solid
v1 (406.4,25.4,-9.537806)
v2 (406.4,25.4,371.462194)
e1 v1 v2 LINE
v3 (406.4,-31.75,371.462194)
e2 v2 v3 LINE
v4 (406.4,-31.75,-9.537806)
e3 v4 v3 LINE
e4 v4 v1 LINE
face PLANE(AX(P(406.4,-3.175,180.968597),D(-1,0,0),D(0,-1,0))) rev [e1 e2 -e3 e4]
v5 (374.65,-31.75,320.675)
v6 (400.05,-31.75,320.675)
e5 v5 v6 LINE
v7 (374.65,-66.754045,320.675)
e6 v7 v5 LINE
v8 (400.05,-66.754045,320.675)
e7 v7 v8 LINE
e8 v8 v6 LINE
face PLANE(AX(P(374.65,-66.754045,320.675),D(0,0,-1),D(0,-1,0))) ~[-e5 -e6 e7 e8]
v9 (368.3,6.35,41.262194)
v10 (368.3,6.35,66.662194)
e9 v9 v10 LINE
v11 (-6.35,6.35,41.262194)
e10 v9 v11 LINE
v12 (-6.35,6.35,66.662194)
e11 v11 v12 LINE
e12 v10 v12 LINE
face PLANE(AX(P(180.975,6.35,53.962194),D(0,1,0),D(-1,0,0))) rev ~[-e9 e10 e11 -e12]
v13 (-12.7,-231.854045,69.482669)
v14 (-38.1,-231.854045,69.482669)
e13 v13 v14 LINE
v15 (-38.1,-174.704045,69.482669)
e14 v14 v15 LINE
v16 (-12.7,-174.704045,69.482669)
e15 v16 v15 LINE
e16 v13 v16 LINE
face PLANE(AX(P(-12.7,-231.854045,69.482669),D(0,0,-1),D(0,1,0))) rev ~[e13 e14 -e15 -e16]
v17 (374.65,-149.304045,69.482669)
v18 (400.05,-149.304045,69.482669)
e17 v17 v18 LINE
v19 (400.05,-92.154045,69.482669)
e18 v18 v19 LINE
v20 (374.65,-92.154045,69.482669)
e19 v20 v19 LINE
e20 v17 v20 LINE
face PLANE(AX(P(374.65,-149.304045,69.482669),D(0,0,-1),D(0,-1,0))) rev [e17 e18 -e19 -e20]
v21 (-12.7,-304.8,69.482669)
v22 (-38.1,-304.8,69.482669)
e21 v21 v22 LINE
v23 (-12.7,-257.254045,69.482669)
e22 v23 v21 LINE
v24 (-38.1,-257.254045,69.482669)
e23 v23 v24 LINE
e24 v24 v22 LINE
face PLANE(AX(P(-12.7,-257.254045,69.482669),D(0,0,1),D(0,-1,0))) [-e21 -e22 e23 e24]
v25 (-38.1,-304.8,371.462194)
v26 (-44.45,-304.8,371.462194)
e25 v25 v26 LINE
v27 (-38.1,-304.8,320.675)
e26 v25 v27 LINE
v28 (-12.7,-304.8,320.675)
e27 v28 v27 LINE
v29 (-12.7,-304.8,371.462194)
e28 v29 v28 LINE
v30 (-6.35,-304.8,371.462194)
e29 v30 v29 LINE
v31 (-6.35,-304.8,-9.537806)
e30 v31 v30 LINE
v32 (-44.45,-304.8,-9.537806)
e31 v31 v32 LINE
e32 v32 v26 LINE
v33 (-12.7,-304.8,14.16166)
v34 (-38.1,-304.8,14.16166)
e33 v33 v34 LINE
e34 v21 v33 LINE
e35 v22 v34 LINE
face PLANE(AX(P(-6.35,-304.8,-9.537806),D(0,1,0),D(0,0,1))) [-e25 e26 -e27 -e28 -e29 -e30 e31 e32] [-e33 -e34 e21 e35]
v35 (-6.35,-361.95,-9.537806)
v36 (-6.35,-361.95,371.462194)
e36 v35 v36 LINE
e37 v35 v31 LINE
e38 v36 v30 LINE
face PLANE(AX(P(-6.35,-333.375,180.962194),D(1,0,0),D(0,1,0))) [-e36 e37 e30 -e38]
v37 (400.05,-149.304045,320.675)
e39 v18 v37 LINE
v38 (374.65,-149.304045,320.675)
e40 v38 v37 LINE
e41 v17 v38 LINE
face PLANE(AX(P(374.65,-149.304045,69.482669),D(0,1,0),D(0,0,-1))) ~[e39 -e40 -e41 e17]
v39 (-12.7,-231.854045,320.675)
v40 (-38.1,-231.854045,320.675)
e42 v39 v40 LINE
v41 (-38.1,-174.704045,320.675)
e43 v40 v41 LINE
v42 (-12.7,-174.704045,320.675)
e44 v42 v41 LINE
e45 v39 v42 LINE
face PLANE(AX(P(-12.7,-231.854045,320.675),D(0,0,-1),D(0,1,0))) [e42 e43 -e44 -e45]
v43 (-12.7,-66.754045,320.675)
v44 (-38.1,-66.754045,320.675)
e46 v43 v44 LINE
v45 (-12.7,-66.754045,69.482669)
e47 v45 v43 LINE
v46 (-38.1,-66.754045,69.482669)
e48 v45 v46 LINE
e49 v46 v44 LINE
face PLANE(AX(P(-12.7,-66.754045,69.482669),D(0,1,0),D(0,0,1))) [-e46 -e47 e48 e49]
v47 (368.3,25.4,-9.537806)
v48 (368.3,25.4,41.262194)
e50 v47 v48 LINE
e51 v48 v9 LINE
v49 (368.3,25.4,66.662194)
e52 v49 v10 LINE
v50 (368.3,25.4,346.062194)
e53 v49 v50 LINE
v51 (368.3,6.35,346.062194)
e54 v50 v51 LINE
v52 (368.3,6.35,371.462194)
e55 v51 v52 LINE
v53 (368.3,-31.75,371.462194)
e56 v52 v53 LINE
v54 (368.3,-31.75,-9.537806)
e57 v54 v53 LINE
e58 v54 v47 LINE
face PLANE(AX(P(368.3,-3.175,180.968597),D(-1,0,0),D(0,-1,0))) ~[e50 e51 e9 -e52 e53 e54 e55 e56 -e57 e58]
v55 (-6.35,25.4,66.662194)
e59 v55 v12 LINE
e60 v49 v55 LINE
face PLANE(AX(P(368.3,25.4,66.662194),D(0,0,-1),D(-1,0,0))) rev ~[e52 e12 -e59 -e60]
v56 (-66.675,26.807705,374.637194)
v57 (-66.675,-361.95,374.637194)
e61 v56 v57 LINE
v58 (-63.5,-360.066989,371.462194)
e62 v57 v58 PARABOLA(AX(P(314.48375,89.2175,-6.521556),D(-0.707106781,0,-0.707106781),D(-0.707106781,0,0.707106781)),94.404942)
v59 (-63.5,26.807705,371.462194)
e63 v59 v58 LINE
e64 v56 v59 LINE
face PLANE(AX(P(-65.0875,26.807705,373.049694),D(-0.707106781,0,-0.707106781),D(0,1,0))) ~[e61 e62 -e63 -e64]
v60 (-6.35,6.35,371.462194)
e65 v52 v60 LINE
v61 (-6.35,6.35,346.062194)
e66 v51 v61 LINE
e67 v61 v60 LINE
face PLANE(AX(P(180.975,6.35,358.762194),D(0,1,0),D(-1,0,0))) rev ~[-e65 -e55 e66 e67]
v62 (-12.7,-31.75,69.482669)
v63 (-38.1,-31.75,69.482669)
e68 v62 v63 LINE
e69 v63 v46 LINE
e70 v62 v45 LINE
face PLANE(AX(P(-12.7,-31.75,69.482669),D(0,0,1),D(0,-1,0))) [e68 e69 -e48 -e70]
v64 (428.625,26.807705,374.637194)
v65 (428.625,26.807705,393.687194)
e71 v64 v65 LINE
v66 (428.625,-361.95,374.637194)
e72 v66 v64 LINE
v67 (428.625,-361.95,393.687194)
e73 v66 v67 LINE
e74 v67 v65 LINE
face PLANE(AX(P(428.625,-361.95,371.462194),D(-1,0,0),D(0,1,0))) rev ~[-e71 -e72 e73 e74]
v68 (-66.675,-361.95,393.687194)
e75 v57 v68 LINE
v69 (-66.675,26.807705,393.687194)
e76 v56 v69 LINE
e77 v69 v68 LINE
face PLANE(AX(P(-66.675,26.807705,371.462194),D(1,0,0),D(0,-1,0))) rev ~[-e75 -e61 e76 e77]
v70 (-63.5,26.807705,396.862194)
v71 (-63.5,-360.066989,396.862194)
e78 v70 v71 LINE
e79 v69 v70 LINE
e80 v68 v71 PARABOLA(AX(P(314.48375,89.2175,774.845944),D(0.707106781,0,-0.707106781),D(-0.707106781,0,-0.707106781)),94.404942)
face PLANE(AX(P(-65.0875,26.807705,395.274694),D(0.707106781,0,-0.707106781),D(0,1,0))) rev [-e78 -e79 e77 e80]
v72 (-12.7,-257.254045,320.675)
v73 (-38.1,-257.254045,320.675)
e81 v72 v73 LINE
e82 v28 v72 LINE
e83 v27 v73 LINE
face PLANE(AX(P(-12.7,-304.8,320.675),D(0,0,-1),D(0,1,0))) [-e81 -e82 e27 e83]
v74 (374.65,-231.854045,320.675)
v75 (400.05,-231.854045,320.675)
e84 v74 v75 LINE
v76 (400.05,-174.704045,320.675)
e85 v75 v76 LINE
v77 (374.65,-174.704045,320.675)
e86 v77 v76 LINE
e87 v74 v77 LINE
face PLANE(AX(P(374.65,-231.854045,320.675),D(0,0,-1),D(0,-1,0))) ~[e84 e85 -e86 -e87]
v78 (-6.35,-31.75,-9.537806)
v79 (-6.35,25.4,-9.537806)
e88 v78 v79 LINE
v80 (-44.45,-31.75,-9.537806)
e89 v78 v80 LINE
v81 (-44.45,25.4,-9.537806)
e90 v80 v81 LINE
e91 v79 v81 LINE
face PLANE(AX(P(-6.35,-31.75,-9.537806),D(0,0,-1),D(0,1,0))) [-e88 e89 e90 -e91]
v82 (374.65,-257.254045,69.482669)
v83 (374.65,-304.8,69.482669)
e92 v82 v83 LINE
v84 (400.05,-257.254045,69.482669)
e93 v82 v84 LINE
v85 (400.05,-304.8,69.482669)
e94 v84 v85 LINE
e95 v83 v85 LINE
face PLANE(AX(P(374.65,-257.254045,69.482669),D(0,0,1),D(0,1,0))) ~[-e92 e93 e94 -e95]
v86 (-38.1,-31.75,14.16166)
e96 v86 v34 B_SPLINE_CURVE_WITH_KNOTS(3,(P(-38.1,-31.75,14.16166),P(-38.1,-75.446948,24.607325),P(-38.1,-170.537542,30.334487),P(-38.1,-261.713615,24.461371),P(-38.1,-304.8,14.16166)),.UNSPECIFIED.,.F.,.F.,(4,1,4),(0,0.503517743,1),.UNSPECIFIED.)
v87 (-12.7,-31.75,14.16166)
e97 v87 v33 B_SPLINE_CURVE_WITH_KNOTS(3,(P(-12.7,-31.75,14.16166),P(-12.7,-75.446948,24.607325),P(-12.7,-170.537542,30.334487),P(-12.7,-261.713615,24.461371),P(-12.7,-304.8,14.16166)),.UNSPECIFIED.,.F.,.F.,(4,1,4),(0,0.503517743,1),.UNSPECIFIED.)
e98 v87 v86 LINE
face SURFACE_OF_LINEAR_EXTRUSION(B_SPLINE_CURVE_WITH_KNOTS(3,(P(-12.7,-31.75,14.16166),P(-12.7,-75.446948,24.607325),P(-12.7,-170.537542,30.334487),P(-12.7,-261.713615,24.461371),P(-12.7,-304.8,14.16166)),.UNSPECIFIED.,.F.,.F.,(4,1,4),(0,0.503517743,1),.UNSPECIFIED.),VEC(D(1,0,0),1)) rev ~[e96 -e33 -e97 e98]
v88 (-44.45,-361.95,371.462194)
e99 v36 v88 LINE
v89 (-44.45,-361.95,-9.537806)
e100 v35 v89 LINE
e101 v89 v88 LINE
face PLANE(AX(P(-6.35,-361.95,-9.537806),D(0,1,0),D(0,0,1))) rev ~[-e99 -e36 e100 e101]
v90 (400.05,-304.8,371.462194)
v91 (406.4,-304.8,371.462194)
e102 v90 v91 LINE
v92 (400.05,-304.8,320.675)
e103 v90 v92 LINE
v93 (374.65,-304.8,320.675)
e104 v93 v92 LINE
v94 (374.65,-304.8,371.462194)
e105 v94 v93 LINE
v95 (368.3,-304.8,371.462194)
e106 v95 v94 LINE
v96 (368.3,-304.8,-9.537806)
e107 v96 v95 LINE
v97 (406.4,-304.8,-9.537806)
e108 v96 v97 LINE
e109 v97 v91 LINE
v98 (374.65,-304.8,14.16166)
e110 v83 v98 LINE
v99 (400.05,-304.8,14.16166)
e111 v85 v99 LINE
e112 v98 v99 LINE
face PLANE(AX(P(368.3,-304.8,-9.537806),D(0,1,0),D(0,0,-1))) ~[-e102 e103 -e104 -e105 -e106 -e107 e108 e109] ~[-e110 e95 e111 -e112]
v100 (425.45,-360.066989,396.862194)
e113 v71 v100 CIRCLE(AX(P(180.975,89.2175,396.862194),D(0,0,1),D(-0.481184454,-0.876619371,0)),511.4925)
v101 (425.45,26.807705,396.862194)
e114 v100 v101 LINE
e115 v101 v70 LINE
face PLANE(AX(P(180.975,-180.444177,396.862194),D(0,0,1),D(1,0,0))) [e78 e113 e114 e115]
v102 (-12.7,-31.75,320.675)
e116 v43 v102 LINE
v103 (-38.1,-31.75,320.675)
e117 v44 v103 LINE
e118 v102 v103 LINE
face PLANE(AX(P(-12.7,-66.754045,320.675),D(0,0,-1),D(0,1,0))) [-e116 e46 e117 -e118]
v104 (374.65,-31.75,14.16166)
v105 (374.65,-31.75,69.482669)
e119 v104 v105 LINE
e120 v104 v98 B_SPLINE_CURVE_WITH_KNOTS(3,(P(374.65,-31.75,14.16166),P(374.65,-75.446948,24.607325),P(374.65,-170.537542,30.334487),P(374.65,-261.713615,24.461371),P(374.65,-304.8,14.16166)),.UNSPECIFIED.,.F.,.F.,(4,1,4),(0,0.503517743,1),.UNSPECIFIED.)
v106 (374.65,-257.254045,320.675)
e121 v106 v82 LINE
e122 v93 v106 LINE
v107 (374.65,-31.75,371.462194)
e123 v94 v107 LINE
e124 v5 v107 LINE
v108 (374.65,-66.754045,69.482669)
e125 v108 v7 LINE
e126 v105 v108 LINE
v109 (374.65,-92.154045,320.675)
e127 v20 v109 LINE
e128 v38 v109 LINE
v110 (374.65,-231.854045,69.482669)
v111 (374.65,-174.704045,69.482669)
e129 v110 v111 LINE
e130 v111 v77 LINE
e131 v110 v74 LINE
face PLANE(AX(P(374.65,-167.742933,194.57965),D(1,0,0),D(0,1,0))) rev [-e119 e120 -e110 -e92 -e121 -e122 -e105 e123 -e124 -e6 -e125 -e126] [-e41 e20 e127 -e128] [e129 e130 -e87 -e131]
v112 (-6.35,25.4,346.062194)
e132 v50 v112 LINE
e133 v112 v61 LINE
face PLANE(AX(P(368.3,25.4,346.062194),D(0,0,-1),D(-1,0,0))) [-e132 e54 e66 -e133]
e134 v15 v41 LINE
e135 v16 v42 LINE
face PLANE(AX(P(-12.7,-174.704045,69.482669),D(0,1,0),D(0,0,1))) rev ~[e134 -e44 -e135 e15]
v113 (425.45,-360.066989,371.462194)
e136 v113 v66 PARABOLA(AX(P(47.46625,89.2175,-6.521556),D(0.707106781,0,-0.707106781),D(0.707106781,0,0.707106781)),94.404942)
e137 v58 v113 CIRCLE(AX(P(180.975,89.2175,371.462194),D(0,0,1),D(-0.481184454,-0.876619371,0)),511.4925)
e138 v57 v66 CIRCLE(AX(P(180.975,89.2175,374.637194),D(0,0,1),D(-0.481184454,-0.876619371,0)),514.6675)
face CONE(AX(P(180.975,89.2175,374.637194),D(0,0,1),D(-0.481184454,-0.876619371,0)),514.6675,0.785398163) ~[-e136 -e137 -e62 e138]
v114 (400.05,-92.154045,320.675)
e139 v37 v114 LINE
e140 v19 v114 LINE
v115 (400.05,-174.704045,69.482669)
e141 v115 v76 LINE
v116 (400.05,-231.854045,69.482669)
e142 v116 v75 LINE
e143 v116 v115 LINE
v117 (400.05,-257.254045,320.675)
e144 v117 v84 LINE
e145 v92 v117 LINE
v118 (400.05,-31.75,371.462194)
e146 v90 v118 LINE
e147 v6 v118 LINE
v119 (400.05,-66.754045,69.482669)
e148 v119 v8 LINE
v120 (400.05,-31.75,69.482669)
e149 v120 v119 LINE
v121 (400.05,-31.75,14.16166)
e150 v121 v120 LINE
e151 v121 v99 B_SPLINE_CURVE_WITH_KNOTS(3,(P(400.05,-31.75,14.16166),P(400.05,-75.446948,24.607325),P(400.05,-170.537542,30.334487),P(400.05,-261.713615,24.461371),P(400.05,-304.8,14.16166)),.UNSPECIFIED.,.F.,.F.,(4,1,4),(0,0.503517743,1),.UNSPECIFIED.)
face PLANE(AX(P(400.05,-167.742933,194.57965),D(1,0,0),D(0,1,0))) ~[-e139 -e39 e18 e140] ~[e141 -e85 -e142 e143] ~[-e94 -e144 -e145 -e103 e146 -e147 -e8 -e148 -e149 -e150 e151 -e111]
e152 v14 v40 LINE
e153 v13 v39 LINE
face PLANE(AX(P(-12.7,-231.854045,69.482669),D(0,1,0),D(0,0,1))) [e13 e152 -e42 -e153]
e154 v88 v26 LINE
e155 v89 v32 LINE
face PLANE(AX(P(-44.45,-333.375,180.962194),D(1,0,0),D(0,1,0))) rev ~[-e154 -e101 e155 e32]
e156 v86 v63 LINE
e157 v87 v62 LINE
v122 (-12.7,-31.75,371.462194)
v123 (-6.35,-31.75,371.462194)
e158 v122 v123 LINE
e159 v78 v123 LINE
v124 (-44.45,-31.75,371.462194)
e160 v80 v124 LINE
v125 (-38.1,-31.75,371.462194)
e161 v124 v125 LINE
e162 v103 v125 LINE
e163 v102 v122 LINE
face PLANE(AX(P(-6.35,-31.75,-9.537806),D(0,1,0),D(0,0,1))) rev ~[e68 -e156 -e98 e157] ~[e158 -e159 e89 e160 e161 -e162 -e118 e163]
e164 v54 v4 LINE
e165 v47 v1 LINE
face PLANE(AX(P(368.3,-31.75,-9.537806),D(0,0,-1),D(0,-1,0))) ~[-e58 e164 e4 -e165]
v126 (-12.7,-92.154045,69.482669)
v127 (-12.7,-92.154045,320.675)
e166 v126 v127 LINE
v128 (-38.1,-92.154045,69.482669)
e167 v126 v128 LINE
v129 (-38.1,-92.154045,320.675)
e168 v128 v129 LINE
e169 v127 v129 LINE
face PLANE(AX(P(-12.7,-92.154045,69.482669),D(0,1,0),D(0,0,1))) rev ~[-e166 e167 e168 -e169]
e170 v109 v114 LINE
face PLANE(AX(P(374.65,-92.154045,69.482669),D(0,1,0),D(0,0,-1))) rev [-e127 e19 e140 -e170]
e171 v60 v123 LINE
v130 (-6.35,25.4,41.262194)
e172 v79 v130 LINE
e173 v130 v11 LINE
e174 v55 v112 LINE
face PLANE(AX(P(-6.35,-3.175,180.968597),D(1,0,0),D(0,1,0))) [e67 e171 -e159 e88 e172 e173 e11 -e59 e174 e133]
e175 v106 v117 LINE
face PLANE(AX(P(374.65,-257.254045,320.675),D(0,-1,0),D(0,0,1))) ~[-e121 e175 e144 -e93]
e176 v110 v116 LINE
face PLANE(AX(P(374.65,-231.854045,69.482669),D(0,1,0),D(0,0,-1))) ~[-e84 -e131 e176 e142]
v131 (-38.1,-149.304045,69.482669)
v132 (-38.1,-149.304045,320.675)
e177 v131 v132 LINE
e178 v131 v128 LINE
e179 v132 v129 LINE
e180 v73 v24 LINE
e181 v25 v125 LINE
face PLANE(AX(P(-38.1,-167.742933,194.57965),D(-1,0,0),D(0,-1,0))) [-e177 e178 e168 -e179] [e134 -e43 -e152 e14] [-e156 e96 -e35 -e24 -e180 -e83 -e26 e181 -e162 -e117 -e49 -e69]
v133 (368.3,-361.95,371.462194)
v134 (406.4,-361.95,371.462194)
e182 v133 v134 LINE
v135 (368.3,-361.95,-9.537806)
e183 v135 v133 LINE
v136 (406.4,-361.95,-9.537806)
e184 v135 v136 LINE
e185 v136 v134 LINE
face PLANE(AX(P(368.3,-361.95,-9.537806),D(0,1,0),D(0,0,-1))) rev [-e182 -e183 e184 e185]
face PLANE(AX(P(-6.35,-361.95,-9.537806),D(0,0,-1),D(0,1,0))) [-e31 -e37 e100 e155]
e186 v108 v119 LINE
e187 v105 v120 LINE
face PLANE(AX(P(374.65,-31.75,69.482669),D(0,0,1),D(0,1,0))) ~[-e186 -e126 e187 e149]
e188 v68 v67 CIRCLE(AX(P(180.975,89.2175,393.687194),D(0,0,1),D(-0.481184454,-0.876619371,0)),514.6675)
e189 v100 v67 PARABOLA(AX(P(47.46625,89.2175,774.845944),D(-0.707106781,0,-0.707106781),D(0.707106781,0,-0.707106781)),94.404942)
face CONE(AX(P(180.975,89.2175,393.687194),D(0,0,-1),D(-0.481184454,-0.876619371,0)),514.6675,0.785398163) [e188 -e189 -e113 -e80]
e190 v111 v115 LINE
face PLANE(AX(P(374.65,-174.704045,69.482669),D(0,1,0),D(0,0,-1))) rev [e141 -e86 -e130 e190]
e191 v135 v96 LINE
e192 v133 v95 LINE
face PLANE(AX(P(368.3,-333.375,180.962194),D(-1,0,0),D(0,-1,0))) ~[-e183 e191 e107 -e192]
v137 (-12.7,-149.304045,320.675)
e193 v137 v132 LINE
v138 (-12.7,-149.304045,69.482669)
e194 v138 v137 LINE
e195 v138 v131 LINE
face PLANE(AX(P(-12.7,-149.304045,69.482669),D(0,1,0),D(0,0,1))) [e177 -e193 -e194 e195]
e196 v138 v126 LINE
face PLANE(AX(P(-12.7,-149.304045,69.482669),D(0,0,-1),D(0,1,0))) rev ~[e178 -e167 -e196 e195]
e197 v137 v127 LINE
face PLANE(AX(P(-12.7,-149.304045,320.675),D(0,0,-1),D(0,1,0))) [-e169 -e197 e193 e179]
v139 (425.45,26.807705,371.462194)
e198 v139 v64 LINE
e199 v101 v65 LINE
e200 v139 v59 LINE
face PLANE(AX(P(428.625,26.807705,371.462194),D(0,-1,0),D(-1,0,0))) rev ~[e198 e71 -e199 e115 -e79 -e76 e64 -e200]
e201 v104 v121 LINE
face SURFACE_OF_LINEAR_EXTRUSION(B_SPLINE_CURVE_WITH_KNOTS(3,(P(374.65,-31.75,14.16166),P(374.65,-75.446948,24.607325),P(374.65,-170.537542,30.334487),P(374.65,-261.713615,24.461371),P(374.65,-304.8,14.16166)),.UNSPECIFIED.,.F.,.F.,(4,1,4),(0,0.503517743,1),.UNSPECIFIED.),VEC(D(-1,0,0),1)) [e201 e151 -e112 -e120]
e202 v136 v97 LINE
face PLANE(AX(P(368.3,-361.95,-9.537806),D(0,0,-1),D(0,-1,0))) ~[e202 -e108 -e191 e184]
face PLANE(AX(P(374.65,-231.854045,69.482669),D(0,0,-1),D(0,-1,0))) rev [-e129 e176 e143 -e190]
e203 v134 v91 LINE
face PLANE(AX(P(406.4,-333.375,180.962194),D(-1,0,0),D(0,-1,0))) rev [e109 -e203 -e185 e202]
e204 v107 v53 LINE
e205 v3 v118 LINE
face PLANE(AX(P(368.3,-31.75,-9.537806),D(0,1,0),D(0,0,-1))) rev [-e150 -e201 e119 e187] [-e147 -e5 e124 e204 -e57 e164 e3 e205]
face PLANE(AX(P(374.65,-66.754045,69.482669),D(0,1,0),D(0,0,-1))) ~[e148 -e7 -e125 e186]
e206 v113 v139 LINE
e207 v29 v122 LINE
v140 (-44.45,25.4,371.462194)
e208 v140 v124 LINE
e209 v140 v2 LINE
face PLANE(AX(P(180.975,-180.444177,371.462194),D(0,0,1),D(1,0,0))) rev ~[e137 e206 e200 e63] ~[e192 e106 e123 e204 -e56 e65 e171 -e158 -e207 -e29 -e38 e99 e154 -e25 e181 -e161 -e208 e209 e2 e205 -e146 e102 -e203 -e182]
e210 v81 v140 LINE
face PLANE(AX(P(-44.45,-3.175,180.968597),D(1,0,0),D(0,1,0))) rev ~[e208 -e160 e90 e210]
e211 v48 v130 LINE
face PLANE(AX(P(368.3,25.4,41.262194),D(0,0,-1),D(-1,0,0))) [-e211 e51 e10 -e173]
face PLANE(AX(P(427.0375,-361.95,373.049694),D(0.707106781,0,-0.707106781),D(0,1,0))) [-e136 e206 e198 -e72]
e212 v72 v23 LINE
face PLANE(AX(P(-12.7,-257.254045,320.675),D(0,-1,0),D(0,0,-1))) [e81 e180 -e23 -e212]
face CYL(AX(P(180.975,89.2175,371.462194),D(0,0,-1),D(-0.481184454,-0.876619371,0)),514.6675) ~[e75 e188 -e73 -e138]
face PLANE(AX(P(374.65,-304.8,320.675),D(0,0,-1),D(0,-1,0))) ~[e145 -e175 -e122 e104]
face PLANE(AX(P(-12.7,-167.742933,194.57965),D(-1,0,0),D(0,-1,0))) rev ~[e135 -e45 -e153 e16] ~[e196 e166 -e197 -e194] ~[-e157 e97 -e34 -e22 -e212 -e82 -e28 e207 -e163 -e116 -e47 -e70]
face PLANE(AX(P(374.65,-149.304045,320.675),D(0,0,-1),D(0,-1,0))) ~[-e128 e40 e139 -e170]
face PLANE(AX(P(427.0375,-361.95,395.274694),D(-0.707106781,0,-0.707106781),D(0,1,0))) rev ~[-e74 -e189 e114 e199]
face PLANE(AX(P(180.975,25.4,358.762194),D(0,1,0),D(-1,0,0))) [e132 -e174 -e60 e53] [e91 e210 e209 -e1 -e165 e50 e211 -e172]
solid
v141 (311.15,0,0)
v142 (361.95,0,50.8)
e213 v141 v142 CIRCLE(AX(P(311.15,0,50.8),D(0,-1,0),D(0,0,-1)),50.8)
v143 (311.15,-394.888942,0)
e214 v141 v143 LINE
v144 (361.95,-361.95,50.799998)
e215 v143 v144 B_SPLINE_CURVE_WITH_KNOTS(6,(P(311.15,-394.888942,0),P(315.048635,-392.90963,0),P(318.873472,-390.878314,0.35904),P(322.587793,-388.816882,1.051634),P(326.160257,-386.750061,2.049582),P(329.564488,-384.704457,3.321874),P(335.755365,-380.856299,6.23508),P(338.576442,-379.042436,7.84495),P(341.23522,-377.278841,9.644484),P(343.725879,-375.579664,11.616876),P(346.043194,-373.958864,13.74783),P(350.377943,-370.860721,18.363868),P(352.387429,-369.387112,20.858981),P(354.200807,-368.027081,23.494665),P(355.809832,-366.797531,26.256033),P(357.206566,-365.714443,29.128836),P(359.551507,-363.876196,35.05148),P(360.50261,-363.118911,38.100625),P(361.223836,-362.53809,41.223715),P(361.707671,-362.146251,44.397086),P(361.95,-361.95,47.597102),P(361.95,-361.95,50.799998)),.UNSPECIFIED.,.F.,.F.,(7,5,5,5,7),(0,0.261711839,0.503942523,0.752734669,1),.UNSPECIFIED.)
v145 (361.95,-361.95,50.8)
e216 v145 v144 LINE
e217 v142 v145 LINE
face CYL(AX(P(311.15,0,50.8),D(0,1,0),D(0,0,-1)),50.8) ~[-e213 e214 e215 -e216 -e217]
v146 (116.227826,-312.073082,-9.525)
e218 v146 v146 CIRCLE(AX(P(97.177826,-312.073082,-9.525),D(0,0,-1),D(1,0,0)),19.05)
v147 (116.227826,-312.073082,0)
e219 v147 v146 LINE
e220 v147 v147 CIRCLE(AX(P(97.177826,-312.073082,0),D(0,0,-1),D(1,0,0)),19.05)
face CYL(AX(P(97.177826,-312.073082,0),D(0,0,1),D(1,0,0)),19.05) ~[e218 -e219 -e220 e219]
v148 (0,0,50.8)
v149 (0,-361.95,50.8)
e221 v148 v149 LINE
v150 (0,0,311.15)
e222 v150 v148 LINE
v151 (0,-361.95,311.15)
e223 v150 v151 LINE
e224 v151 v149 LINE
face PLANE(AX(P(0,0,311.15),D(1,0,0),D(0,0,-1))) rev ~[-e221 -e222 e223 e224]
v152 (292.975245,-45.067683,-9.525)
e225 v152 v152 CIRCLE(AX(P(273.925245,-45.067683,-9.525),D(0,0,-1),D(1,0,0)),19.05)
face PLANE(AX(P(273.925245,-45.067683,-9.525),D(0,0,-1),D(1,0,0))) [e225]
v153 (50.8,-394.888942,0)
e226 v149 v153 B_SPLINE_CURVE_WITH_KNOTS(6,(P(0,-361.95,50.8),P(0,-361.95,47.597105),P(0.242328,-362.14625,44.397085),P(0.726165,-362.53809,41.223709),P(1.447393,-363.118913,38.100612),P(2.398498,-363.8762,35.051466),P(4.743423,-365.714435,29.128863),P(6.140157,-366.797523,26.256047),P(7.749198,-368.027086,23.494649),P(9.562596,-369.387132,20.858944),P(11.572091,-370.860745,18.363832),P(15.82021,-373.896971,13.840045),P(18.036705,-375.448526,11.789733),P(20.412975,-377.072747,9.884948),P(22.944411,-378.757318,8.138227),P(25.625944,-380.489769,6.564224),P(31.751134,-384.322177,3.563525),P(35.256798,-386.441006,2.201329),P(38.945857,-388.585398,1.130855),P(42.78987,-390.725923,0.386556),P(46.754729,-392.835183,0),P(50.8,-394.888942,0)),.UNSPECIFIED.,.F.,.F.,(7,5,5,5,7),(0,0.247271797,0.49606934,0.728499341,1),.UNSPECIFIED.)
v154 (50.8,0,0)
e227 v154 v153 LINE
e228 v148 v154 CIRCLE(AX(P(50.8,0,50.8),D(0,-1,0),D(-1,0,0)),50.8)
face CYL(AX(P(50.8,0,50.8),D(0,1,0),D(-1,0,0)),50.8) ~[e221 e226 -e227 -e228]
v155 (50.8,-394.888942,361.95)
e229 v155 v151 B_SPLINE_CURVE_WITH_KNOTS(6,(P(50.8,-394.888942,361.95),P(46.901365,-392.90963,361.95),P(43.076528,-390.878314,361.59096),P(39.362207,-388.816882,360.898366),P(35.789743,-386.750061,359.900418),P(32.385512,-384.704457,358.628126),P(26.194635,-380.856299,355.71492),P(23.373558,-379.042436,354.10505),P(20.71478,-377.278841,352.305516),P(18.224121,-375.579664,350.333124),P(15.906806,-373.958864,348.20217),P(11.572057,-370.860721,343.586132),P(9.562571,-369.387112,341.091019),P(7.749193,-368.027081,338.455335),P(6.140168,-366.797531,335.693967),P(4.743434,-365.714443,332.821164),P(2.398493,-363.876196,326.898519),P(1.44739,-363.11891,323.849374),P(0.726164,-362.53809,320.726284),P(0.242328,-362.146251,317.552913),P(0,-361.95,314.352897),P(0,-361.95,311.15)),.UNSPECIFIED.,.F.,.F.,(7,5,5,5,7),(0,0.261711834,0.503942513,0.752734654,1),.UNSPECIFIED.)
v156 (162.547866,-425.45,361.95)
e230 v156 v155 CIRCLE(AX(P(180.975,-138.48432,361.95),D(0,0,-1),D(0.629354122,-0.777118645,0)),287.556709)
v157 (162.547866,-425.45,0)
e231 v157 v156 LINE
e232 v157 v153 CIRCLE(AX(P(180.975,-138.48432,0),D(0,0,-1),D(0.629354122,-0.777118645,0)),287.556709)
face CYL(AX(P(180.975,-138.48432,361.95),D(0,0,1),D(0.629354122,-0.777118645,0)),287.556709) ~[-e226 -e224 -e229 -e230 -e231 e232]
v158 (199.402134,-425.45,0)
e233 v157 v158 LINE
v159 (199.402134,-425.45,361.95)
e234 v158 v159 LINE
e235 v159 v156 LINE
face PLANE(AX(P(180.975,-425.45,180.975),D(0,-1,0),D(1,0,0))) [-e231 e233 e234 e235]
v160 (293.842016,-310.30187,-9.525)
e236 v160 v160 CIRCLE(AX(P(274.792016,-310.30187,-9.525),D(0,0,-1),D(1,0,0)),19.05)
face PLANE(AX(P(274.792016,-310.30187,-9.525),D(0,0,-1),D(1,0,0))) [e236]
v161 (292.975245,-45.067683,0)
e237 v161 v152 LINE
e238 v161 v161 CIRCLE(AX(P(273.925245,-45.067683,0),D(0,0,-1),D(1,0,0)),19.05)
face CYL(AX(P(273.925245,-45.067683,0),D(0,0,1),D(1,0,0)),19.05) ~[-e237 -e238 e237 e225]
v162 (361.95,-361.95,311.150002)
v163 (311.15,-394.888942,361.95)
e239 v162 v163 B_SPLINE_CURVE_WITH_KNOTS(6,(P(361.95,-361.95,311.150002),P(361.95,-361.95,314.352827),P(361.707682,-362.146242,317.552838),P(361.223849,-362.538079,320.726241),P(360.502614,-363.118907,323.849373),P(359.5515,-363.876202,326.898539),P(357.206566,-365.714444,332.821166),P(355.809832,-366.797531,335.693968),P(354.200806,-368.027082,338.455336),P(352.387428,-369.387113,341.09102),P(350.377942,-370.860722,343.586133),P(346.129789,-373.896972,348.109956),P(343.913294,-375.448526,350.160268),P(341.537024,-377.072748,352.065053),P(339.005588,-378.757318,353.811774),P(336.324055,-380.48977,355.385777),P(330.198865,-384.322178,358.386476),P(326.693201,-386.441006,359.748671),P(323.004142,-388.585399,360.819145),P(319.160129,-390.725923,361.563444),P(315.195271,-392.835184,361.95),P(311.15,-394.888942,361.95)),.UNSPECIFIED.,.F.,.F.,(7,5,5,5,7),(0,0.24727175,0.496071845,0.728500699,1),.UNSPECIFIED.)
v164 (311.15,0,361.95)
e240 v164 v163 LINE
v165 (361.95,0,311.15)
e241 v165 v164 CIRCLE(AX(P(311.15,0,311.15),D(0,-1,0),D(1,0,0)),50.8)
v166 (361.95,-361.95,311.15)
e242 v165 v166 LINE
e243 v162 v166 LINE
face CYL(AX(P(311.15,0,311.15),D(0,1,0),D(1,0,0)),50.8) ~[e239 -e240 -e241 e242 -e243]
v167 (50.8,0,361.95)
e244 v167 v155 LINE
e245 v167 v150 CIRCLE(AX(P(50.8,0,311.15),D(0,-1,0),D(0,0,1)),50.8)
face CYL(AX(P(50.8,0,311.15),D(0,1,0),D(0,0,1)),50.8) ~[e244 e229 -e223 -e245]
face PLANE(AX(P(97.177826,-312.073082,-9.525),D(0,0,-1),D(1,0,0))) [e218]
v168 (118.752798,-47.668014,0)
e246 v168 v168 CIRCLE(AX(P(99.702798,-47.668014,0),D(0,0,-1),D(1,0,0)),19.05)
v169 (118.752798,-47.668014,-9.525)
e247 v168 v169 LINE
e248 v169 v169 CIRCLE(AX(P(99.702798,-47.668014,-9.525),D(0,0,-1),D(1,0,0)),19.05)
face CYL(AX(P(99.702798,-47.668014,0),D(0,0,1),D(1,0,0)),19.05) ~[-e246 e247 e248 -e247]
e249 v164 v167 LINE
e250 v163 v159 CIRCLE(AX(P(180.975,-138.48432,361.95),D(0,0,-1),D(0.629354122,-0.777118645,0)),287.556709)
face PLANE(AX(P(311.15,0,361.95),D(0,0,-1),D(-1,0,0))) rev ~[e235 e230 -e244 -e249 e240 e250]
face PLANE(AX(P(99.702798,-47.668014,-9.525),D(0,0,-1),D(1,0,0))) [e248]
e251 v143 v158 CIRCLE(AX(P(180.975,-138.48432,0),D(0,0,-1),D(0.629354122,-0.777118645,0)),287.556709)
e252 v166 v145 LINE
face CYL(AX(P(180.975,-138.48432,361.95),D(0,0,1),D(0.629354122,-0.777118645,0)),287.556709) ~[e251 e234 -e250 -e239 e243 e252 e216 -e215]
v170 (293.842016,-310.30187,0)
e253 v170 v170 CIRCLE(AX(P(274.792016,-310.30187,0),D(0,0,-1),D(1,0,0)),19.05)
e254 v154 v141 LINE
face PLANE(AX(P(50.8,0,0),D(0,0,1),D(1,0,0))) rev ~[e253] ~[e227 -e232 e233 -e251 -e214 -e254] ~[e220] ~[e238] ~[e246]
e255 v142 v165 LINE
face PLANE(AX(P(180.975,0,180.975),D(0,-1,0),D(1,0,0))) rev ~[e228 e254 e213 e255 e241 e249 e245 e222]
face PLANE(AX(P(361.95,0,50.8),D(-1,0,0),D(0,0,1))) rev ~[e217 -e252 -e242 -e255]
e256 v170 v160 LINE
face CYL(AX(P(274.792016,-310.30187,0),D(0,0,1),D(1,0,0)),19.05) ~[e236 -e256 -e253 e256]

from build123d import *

# Parameters (mm, degrees)
F4_DEPTH  = 425.45
F5_R      = 19.05
F6_DEPTH  = 9.525
F8_DEPTH  = 361.95
F9_W      = 57.15
F9_H      = 381.0128062427
F10_DEPTH = 38.1
F9_H_2    = 381
F11_W     = 57.15
F11_H     = 251.1923307657
F12_DEPTH = 25.4
F16_DEPTH = 25.4
F17_SIZE  = 3.175
F18_W     = 374.65
F18_H     = 25.4
F19_DEPTH = 19.05


# Not quite as in the source:
# - a feature names something its author has since deleted; it is built from what else it names


with BuildPart() as f4:
    # F3 (on Front) → F4 (new body)
    with BuildSketch(Plane.XZ):
        with BuildLine():
            ThreePointArc((0, 50.8), (14.8789755157, 14.8789755157), (50.8, 0))
            Line((50.8, 0), (311.15, 0))
            ThreePointArc((311.15, 0), (347.0710244843, 14.8789755157), (361.95, 50.8))
            Line((361.95, 50.8), (361.95, 311.15))
            ThreePointArc((361.95, 311.15), (347.0710244843, 347.0710244843), (311.15, 361.95))
            Line((311.15, 361.95), (50.8, 361.95))
            ThreePointArc((50.8, 361.95), (14.8789755157, 347.0710244843), (0, 311.15))
            Line((0, 311.15), (0, 50.8))
        make_face()
    extrude(amount=F4_DEPTH)

    # F5 (on face) → F6 (join)
    with BuildSketch(Plane(origin=(0, 0, 0), x_dir=(1, 0, 0), z_dir=(0, 0, -1))):
        with Locations((97.1778258681, 312.0730817318)):
            Circle(F5_R)
        with Locations((274.7920155525, 310.3018701077)):
            Circle(F5_R)
        with Locations((273.9252448082, 45.0676828623)):
            Circle(F5_R)
        with Locations((99.7027978301, 47.6680137217)):
            Circle(F5_R)
    extrude(amount=F6_DEPTH)

    # F7 (on face) → F8 (cut)
    with BuildSketch(Plane.XY.offset(361.95)):
        with BuildLine():
            Line((0, -361.95), (0, -425.45))
            Line((0, -425.45), (0, -444.5584714413))
            Line((0, -444.5584714413), (361.95, -444.5584714413))
            Line((361.95, -444.5584714413), (361.95, -425.45))
            Line((361.95, -425.45), (361.95, -361.95))
            ThreePointArc((361.95, -361.95), (180.975, -426.0410288054), (0, -361.95))
        make_face()
    extrude(amount=-F8_DEPTH, mode=Mode.SUBTRACT)


with BuildPart() as f10:
    # F9 (on offset) → F10 (new body)
    with BuildSketch(Plane.YZ.offset(-6.35)):
        with Locations((-3.175, 180.9685968786)):
            Rectangle(F9_W, F9_H)
    extrude(amount=-F10_DEPTH)



with BuildPart() as f10b:
    # F9 (on offset) → F10, piece 2 (new body)
    with BuildSketch(Plane.YZ.offset(-6.35)):
        with Locations((-333.375, 180.9621937573)):
            Rectangle(F9_W, F9_H_2)
    extrude(amount=-F10_DEPTH)


with BuildPart() as f10_1:
    add(f10.part)

    add(f10b.part)  # F12 merges F10b
    # F11 (on offset) → F12 (join)
    with BuildSketch(Plane.YZ.offset(-12.7)):
        with BuildLine():
            add(Edge.make_bspline(
                [(-31.75, 14.161660336), (-75.4469480959, 24.607324823), (-170.5375424164, 30.3344869468), (-261.7136147626, 24.4613710426), (-304.8, 14.161660336)],
                knots=[0, 0, 0, 0, 0.5035177426, 1, 1, 1, 1], degree=3))
            Line((-31.75, 14.161660336), (-31.75, 69.4826692343))
            Line((-31.75, 69.4826692343), (-66.7540449142, 69.4826692343))
            Line((-66.7540449142, 69.4826692343), (-66.7540449142, 320.675))
            Line((-66.7540449142, 320.675), (-31.75, 320.675))
            Line((-31.75, 320.675), (-31.75, 371.475))
            Line((-31.75, 371.475), (-304.8, 371.475))
            Line((-304.8, 371.475), (-304.8, 371.4621937573))
            Line((-304.8, 371.4621937573), (-304.8, 320.675))
            Line((-304.8, 320.675), (-257.2540449142, 320.675))
            Line((-257.2540449142, 320.675), (-257.2540449142, 69.4826692343))
            Line((-257.2540449142, 69.4826692343), (-304.8, 69.4826692343))
            Line((-304.8, 69.4826692343), (-304.8, 14.161660336))
        make_face()
        with Locations((-203.2790449142, 195.0788346171)):
            Rectangle(F11_W, F11_H, mode=Mode.SUBTRACT)
        with Locations((-120.7290449142, 195.0788346171)):
            Rectangle(F11_W, F11_H, mode=Mode.SUBTRACT)
    extrude(amount=-F12_DEPTH)


with BuildPart() as f13_1:
    # F13: instance of F10
    add(f10_1.part.mirror(Plane.YZ.offset(180.975)))


with BuildPart() as f10_2:
    add(f10_1.part)

    add(f13_1.part)  # F16 merges F13_1
    # F15 (on offset) → F16 (join)
    with BuildSketch(Plane.XY.offset(371.4621937573)):
        with BuildLine():
            Line((-66.675, 26.8077049404), (-66.675, 0))
            Line((-66.675, 0), (-66.675, -361.95))
            ThreePointArc((-66.675, -361.95), (180.975, -425.45), (428.625, -361.95))
            Line((428.625, -361.95), (428.625, 0))
            Line((428.625, 0), (428.625, 26.8077049404))
            Line((428.625, 26.8077049404), (-66.675, 26.8077049404))
        make_face()
    extrude(amount=F16_DEPTH)

    # F17
    f17_edges = [f10_2.edges().sort_by_distance(p)[0] for p in [
        (428.625, -167.571148, 396.862194),
        (180.975, -425.45, 396.862194),
        (-66.675, -167.571148, 396.862194),
        (428.625, -167.571148, 371.462194),
        (180.975, -425.45, 371.462194),
        (-66.675, -167.571148, 371.462194),
    ]]
    chamfer(f17_edges, length=F17_SIZE)

    # F18 (on face) → F19 (join)
    with BuildSketch(Plane(origin=(0, 25.4, 0), x_dir=(-1, 0, 0), z_dir=(0, 1, 0))):
        with Locations((-180.975, 358.7621937573)):
            Rectangle(F18_W, F18_H)
        with Locations((-180.975, 53.9621937573)):
            Rectangle(F18_W, F18_H)
    extrude(amount=-F19_DEPTH)


solid = Compound([f4.part, f10_2.part])
